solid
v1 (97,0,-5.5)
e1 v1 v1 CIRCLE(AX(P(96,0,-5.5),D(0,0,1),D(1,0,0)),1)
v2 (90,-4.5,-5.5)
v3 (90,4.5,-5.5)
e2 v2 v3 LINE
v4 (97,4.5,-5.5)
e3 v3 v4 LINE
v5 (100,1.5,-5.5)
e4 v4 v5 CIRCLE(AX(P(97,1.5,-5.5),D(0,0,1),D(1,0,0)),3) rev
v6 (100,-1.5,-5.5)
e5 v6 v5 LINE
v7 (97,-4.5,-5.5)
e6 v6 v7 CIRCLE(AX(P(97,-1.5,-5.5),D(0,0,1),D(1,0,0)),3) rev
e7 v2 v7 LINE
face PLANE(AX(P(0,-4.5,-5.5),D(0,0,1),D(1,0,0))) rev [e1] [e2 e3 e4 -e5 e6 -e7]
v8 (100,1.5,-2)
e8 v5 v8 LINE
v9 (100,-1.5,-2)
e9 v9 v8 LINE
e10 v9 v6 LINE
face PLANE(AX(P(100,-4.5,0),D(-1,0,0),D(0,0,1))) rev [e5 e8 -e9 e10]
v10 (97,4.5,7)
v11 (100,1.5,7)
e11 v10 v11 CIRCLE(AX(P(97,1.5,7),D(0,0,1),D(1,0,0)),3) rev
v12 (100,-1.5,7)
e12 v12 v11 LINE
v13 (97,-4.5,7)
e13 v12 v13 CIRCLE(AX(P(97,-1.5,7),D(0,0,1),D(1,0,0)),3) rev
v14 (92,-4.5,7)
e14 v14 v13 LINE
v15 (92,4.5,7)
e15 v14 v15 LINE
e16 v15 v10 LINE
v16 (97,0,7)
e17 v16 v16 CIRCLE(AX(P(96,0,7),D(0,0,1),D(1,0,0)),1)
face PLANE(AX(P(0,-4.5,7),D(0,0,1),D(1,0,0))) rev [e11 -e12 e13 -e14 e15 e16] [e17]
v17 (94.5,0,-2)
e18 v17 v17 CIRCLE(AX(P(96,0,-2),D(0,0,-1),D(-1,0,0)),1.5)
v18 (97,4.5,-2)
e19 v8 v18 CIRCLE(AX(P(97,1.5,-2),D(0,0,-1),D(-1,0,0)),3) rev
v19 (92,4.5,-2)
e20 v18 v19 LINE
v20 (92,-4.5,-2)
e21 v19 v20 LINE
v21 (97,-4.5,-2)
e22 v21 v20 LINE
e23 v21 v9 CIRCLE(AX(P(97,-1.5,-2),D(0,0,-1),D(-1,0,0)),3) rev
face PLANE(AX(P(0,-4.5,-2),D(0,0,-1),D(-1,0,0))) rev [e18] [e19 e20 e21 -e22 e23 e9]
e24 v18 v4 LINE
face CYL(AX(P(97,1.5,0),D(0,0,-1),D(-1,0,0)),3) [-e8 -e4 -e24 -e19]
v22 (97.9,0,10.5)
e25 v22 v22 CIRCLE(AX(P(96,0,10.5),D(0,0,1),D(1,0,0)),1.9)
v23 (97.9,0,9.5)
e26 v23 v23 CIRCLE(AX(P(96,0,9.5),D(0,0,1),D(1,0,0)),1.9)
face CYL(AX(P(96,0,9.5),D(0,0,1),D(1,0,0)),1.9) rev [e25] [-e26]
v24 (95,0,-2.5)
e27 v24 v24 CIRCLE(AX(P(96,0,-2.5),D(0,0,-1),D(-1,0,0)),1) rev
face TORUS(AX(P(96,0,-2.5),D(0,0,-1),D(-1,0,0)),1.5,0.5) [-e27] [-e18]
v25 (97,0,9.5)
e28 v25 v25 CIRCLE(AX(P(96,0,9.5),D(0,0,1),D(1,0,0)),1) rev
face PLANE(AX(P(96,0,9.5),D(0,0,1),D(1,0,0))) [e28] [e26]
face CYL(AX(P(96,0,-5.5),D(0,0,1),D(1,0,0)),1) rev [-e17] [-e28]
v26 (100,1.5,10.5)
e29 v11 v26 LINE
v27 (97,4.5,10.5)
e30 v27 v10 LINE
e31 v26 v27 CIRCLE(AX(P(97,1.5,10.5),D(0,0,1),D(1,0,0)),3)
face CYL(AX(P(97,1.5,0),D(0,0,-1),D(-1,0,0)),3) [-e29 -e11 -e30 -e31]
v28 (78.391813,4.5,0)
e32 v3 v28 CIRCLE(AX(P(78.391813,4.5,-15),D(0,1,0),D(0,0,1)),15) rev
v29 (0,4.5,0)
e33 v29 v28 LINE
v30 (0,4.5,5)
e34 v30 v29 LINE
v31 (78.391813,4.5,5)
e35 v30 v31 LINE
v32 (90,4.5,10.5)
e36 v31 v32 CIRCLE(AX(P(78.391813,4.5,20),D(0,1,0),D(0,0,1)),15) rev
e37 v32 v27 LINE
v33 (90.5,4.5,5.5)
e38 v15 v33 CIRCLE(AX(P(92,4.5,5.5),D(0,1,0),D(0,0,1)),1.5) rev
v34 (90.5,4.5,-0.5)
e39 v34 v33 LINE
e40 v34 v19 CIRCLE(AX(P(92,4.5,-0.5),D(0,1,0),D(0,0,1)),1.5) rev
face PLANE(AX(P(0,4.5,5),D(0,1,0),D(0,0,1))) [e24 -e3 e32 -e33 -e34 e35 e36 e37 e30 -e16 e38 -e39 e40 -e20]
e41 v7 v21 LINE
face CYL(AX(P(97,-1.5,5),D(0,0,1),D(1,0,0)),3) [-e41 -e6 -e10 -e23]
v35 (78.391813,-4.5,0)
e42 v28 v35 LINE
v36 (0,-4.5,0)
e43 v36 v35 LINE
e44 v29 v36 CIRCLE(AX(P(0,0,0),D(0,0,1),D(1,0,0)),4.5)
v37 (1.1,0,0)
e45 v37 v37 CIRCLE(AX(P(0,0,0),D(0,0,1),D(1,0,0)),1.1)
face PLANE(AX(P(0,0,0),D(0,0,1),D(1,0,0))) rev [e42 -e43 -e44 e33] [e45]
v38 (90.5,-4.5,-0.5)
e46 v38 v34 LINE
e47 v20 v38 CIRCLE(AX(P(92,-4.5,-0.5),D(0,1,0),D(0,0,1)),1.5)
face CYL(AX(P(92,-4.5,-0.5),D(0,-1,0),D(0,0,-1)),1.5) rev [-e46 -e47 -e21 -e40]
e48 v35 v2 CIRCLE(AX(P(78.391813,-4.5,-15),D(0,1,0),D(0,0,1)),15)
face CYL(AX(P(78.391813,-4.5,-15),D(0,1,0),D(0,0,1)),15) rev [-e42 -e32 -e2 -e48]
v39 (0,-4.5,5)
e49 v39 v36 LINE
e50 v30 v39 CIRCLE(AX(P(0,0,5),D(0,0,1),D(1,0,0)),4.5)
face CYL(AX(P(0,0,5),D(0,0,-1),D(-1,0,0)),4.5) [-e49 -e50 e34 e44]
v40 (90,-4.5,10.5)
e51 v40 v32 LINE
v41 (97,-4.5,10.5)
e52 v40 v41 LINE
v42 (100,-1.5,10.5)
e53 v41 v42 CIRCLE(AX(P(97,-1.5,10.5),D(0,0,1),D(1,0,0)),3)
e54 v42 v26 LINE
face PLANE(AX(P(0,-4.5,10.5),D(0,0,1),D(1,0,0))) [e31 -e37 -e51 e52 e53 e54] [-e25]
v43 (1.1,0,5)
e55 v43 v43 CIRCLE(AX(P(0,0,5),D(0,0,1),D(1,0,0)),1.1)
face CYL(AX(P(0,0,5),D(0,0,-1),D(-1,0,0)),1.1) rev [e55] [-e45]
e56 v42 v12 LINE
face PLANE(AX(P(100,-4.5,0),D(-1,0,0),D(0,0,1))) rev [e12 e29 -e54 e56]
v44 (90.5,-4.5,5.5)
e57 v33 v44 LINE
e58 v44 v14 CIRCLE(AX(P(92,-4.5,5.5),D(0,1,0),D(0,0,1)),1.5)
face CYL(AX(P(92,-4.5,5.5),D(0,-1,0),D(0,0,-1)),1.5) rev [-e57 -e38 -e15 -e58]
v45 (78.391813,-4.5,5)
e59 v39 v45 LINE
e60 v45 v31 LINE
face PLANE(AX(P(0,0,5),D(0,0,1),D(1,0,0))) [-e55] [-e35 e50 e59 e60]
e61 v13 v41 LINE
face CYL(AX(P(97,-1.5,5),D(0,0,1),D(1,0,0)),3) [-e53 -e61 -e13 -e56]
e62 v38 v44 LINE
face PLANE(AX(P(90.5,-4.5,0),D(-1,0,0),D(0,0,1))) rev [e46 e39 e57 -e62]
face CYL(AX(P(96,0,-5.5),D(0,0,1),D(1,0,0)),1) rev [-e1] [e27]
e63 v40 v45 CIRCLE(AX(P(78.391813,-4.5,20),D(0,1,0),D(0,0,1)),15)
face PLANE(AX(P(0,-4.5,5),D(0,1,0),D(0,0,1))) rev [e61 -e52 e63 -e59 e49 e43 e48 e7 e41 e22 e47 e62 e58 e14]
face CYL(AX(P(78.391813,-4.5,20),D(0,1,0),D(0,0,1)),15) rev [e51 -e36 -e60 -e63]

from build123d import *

# Parameters (mm, degrees)
SKETCH1_R           = 1.1
BOSS_EXTRUDE1_DEPTH = 5
BOSS_EXTRUDE2_DEPTH = 9
FILLET1_R           = 15
SKETCH3_R           = 1
CUT_EXTRUDE1_DEPTH  = 16
FILLET2_R           = 3
SKETCH4_R           = 1.9
CUT_EXTRUDE2_DEPTH  = 1
FILLET3_R           = 1.5
FILLET4_R           = 0.5


with BuildPart() as part:
    # Sketch1 → Boss-Extrude1 (new body)
    with BuildSketch(Plane.XY):
        with BuildLine():
            ThreePointArc((0, 4.5), (-4.5, 0), (0, -4.5))
            Line((0, -4.5), (90, -4.5))
            Line((90, -4.5), (90, 4.5))
            Line((90, 4.5), (0, 4.5))
        make_face()
        Circle(SKETCH1_R, mode=Mode.SUBTRACT)
    extrude(amount=BOSS_EXTRUDE1_DEPTH)

    # Sketch2 → Boss-Extrude2 (add)
    with BuildSketch(Plane(origin=(0, 4.5, 0), x_dir=(1, 0, 0), z_dir=(0, 1, 0))):
        Polygon((90.5, 2), (100, 2), (100, 5.5), (90, 5.5), (90, 0), (90, -5), (90, -10.5), (100, -10.5), (100, -7), (90.5, -7), align=None)
    extrude(amount=-BOSS_EXTRUDE2_DEPTH)

    # Fillet1
    # the kernel refuses this fillet: 15 mm, written as the material it adds along each edge
    with BuildSketch(Plane(origin=(90, -4.5, 0), x_dir=(0, 0, -1), z_dir=(0, 1, 0))) as fillet1_piece_1:
        with BuildLine():
            CenterArc((15, 11.608186766), FILLET1_R, 180, 50.703519761)
            Line((0, 11.608186766), (-0.3, 11.608186766))
            Line((-0.3, 11.608186766), (-0.3, 0))
            Line((-0.3, 0), (0, -0.3))
            ThreePointArc((0, -0.3), (2.75, -0.3), (5.31, -0.232163735))
            Line((5.31, -0.232163735), (5.5, 0))
        make_face()
    extrude(amount=9)
    with BuildSketch(Plane(origin=(90, -4.5, 5), x_dir=(0, 0, 1), z_dir=(0, 1, 0))) as fillet1_piece_2:
        with BuildLine():
            CenterArc((15, -11.608186766), FILLET1_R, 129.296480239, 50.703519761)
            Line((0, -11.608186766), (-0.3, -11.608186766))
            Line((-0.3, -11.608186766), (-0.3, 0))
            Line((-0.3, 0), (0, 0.3))
            ThreePointArc((0, 0.3), (2.75, 0.3), (5.31, 0.232163735))
            Line((5.31, 0.232163735), (5.5, 0))
        make_face()
    extrude(amount=9)

    # Sketch3 → Cut-Extrude1 (cut)
    with BuildSketch(Plane.XY.offset(10.5)):
        with Locations((96, 0)):
            Circle(SKETCH3_R)
    extrude(amount=-CUT_EXTRUDE1_DEPTH, mode=Mode.SUBTRACT)

    # Fillet2
    fillet2_edges = [part.edges().sort_by_distance(p)[0] for p in [
        (100, 4.5, 8.75),
        (100, 4.5, -3.75),
        (100, -4.5, 8.75),
        (100, -4.5, -3.75),
    ]]
    fillet(fillet2_edges, radius=FILLET2_R)

    # Sketch4 → Cut-Extrude2 (cut)
    with BuildSketch(Plane.XY.offset(10.5)):
        with Locations((96, 0)):
            Circle(SKETCH4_R)
    extrude(amount=-CUT_EXTRUDE2_DEPTH, mode=Mode.SUBTRACT)

    # Fillet3
    fillet3_edges = [part.edges().sort_by_distance(p)[0] for p in [
        (90.5, 0, 7),
        (90.5, 0, -2),
    ]]
    fillet(fillet3_edges, radius=FILLET3_R)

    # Fillet4
    fillet4_edges = [part.edges().sort_by_distance(p)[0] for p in [
        (95, 0, -2),
    ]]
    fillet(fillet4_edges, radius=FILLET4_R)


solid = part.part
